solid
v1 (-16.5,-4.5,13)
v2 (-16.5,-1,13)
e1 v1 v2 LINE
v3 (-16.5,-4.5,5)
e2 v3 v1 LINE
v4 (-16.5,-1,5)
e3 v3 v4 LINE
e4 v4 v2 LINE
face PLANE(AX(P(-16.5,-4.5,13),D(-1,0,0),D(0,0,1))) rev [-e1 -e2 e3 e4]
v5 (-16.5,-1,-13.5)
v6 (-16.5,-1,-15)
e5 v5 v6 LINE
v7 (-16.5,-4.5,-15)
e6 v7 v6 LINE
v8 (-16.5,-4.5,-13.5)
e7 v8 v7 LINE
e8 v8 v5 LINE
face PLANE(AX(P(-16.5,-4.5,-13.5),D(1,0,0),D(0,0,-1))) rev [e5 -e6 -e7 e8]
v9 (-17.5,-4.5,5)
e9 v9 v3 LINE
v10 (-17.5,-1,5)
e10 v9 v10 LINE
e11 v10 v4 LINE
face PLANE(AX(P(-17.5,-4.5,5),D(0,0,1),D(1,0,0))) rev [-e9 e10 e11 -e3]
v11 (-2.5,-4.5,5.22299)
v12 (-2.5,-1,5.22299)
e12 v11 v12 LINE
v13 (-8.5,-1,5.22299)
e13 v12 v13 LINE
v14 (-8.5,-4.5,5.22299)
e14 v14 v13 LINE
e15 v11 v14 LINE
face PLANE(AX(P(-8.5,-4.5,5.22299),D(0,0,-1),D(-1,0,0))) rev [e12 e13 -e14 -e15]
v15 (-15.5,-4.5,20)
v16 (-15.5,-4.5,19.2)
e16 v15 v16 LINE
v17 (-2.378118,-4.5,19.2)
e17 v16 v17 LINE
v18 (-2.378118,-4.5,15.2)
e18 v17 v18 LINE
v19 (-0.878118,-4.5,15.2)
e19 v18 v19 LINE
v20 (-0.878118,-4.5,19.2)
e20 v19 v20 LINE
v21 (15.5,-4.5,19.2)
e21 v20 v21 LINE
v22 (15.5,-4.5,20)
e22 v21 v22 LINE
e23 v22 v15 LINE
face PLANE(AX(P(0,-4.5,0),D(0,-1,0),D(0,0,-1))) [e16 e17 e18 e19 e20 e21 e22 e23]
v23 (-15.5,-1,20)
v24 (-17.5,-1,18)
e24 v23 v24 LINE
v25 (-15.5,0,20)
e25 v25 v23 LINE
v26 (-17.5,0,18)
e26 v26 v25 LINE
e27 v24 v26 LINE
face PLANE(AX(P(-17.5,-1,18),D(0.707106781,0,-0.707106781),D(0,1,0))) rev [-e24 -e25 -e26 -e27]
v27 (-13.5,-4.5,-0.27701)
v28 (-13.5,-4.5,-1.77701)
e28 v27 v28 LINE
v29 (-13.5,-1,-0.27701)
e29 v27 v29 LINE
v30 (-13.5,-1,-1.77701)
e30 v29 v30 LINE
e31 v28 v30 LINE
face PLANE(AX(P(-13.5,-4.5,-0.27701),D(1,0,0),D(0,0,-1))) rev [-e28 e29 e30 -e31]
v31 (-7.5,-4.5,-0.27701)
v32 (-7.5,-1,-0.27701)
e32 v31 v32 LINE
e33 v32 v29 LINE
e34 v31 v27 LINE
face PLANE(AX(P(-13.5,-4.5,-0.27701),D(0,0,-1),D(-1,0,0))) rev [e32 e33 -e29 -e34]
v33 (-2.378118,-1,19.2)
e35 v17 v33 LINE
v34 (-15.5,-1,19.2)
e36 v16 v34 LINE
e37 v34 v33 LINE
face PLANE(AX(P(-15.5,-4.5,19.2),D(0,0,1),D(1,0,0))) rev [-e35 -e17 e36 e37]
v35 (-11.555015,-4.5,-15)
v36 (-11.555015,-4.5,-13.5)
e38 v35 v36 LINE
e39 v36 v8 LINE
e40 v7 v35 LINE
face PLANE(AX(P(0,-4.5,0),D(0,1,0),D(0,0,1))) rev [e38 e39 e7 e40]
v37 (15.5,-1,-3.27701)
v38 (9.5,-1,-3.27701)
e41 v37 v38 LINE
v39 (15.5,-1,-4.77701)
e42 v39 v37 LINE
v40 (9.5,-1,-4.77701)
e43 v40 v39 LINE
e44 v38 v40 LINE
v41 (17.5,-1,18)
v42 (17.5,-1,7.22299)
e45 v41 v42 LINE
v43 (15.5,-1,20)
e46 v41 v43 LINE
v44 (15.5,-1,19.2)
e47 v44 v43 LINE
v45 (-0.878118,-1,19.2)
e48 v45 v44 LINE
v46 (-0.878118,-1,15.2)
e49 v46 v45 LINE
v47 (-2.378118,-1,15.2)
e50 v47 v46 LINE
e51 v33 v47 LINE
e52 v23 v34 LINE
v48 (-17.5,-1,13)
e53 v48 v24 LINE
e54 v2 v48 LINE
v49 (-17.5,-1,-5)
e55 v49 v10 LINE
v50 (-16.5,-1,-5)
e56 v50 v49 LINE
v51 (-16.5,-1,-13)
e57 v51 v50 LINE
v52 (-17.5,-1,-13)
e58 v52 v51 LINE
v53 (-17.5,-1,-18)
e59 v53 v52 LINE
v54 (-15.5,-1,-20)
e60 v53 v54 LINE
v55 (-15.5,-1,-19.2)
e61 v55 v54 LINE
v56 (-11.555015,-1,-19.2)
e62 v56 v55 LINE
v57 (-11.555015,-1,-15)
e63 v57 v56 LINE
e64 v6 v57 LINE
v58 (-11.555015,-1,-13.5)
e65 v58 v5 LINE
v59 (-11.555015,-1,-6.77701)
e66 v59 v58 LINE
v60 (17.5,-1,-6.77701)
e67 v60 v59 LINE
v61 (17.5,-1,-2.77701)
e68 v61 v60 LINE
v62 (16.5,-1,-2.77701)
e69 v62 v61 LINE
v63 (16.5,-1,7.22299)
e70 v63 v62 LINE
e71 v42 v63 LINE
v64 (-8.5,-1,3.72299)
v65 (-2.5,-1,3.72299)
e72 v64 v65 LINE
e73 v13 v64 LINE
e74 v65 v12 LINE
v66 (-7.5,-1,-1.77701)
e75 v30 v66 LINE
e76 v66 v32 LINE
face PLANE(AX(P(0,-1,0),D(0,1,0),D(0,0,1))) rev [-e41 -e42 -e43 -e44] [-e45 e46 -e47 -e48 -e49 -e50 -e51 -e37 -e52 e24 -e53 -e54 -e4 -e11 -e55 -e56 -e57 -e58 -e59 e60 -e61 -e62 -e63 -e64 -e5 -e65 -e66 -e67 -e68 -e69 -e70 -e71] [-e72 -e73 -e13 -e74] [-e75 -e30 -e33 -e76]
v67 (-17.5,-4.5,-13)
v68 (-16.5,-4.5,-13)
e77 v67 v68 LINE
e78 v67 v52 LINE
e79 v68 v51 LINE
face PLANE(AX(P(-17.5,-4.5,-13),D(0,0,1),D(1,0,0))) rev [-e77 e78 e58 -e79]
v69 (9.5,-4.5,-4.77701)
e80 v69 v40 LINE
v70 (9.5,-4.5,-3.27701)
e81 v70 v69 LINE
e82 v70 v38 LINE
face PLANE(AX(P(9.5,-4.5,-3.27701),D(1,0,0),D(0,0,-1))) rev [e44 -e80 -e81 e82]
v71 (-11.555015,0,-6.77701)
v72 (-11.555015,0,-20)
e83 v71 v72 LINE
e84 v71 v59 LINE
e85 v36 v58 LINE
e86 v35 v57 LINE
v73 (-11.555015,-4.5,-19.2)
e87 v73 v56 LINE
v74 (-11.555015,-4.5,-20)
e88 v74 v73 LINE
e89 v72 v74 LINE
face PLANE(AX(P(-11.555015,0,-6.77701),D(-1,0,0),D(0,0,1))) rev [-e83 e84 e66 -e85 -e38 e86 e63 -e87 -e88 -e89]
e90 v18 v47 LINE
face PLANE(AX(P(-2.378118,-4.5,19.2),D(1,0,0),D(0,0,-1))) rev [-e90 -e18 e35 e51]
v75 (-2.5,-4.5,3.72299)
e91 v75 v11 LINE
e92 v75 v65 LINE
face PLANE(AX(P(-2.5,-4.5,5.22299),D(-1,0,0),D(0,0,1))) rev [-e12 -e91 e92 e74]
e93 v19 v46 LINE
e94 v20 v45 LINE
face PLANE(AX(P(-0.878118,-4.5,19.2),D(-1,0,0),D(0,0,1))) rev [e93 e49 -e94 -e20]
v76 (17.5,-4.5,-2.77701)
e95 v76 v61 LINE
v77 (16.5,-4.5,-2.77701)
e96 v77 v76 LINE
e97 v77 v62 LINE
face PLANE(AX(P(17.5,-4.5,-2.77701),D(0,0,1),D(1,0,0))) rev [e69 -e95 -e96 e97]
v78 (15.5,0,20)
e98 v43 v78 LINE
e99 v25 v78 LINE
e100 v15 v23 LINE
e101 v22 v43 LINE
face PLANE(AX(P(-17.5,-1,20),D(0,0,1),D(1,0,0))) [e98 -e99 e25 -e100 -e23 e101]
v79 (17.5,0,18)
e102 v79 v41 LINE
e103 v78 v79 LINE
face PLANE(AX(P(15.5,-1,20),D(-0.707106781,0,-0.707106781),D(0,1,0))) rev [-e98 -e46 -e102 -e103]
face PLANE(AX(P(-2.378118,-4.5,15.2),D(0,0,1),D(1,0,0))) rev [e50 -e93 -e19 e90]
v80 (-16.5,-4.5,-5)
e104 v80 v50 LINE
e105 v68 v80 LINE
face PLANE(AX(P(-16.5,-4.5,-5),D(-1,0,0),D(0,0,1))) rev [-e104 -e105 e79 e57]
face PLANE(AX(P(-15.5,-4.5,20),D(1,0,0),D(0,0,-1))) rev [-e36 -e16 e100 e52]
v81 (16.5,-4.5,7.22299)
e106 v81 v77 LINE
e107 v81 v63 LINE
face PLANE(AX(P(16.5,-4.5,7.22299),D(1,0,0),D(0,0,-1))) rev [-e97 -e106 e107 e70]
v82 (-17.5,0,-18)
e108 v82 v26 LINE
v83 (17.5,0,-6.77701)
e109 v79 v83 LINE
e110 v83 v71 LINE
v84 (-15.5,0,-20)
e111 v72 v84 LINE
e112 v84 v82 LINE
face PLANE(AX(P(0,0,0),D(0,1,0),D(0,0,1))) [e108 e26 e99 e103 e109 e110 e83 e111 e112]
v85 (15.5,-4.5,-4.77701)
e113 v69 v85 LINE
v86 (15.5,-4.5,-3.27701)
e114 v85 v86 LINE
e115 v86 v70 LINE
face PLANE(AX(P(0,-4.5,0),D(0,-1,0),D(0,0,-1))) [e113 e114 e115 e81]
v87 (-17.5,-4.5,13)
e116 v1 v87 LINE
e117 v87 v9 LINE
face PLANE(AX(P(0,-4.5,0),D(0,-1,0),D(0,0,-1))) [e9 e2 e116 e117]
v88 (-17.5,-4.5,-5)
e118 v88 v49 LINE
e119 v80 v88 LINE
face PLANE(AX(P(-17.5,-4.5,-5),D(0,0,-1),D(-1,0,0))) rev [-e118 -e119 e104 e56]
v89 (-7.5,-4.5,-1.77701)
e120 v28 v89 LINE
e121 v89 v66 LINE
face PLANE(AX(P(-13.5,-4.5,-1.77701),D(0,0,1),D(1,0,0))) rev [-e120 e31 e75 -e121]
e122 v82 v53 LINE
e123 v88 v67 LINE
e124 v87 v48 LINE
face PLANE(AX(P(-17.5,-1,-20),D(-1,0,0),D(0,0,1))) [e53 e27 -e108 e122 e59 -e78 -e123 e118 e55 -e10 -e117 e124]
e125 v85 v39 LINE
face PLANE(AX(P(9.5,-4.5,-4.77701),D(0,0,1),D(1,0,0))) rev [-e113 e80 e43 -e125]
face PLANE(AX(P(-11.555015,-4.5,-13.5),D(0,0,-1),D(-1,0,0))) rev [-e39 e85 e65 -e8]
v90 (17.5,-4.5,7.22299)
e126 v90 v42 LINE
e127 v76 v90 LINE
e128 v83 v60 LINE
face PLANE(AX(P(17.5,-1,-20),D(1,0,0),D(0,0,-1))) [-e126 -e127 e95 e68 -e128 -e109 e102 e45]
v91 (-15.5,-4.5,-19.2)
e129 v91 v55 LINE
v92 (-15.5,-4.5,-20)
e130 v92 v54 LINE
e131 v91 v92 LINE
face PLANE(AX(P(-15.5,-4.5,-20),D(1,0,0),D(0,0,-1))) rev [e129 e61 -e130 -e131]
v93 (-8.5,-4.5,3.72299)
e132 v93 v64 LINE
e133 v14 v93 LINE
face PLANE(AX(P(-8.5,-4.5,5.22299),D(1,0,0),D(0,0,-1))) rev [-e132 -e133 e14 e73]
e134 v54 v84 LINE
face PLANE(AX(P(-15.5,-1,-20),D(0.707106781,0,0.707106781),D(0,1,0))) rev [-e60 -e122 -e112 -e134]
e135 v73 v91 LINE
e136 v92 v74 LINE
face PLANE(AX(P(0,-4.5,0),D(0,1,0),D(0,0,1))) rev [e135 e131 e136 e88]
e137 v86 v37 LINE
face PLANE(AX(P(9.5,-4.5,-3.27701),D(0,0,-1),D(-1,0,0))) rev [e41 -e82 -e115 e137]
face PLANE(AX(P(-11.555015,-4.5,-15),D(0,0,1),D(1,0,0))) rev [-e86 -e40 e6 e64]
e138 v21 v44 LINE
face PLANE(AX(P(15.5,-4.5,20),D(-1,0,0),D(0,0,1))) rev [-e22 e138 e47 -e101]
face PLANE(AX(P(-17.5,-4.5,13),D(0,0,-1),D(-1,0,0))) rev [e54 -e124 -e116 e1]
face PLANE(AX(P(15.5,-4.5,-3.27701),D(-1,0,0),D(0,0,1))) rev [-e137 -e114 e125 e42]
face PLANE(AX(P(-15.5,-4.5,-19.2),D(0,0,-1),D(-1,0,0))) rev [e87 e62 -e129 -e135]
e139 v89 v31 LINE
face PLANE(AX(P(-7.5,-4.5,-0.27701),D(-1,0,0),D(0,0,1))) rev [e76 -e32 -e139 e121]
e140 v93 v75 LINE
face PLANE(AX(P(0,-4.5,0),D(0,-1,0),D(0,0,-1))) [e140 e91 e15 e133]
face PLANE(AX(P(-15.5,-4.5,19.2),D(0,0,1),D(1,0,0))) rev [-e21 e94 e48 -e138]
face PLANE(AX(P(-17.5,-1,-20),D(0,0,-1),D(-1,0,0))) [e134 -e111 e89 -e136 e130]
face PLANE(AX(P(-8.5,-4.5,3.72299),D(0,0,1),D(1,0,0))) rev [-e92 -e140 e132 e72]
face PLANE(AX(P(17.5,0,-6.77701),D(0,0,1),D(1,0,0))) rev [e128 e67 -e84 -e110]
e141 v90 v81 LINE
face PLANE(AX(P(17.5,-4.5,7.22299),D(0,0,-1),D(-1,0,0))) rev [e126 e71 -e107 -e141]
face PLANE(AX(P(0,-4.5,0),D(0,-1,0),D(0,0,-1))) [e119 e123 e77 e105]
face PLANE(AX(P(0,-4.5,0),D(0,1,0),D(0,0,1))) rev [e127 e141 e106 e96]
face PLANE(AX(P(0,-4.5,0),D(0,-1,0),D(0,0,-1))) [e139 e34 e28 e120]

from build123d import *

# Parameters (mm, degrees)
SKETCH_1_W             = 35
SKETCH_1_H             = 40
SM_BASE_FLANGE_1_DEPTH = 1
CHAMFER_1_SIZE         = 2
SKETCH_9_W             = 31
SKETCH_9_H             = 0.8
EXTRUDE_1_DEPTH        = 3.5
CUT_EXTRUDE_1_DEPTH    = 27.804850307
SKETCH_11_W            = 3.944984663
SKETCH_11_H            = 0.8
EXTRUDE_2_DEPTH        = 3.5
SKETCH_12_W            = 1
SKETCH_12_H            = 8
SKETCH_12_H_2          = 10
EXTRUDE_3_DEPTH        = 3.5
SKETCH_13_W            = 6
SKETCH_13_H            = 1.5
SKETCH_13_W_2          = 4.944984663
SKETCH_13_W_3          = 1.5
SKETCH_13_H_2          = 4
EXTRUDE_4_DEPTH        = 3.5


# Sheet-metal steps are written as plain solids
with BuildPart() as part:
    # Sketch 1 → 基体-法兰1 (new body)
    with BuildSketch(Plane(origin=(0, 0, 0), x_dir=(1, 0, 0), z_dir=(0, 1, 0))):
        Rectangle(SKETCH_1_W, SKETCH_1_H)
    extrude(amount=-SM_BASE_FLANGE_1_DEPTH)

    # 倒角1
    chamfer_1_edges = [part.edges().sort_by_distance(p)[0] for p in [
        (17.5, -0.5, 20),
        (-17.5, -0.5, 20),
        (-17.5, -0.5, -20),
        (17.5, -0.5, -20),
    ]]
    chamfer(chamfer_1_edges, length=CHAMFER_1_SIZE)

    # 草图9 → 凸台-拉伸1 (add)
    with BuildSketch(Plane.XZ.offset(1)):
        with Locations((0, 19.6)):
            Rectangle(SKETCH_9_W, SKETCH_9_H)
    extrude(amount=EXTRUDE_1_DEPTH)

    # 草图10 → 切除-拉伸1 (cut, through all)
    with BuildSketch(Plane.XZ.offset(1)):
        Polygon((17.5, -6.777010343), (-11.555015337, -6.777010343), (-11.555015337, -20), (15.5, -20), (17.5, -18), align=None)
    extrude(amount=-CUT_EXTRUDE_1_DEPTH, mode=Mode.SUBTRACT)

    # 草图11 → 凸台-拉伸2 (add)
    with BuildSketch(Plane.XZ.offset(1)):
        with Locations((-13.527507669, -19.6)):
            Rectangle(SKETCH_11_W, SKETCH_11_H)
    extrude(amount=EXTRUDE_2_DEPTH)

    # 草图12 → 凸台-拉伸3 (add)
    with BuildSketch(Plane.XZ.offset(1)):
        with Locations((-17, 9)):
            Rectangle(SKETCH_12_W, SKETCH_12_H)
        with Locations((-17, -9)):
            Rectangle(SKETCH_12_W, SKETCH_12_H)
        with Locations((17, 2.222989657)):
            Rectangle(SKETCH_12_W, SKETCH_12_H_2)
    extrude(amount=EXTRUDE_3_DEPTH)

    # 草图13 → 凸台-拉伸4 (add)
    with BuildSketch(Plane.XZ.offset(1)):
        with Locations((-10.5, -1.027010343)):
            Rectangle(SKETCH_13_W, SKETCH_13_H)
        with Locations((-5.5, 4.472989657)):
            Rectangle(SKETCH_13_W, SKETCH_13_H)
        with Locations((12.5, -4.027010343)):
            Rectangle(SKETCH_13_W, SKETCH_13_H)
        with Locations((-14.027507669, -14.25)):
            Rectangle(SKETCH_13_W_2, SKETCH_13_H)
        with Locations((-1.628117535, 17.2)):
            Rectangle(SKETCH_13_W_3, SKETCH_13_H_2)
    extrude(amount=EXTRUDE_4_DEPTH)


solid = part.part
